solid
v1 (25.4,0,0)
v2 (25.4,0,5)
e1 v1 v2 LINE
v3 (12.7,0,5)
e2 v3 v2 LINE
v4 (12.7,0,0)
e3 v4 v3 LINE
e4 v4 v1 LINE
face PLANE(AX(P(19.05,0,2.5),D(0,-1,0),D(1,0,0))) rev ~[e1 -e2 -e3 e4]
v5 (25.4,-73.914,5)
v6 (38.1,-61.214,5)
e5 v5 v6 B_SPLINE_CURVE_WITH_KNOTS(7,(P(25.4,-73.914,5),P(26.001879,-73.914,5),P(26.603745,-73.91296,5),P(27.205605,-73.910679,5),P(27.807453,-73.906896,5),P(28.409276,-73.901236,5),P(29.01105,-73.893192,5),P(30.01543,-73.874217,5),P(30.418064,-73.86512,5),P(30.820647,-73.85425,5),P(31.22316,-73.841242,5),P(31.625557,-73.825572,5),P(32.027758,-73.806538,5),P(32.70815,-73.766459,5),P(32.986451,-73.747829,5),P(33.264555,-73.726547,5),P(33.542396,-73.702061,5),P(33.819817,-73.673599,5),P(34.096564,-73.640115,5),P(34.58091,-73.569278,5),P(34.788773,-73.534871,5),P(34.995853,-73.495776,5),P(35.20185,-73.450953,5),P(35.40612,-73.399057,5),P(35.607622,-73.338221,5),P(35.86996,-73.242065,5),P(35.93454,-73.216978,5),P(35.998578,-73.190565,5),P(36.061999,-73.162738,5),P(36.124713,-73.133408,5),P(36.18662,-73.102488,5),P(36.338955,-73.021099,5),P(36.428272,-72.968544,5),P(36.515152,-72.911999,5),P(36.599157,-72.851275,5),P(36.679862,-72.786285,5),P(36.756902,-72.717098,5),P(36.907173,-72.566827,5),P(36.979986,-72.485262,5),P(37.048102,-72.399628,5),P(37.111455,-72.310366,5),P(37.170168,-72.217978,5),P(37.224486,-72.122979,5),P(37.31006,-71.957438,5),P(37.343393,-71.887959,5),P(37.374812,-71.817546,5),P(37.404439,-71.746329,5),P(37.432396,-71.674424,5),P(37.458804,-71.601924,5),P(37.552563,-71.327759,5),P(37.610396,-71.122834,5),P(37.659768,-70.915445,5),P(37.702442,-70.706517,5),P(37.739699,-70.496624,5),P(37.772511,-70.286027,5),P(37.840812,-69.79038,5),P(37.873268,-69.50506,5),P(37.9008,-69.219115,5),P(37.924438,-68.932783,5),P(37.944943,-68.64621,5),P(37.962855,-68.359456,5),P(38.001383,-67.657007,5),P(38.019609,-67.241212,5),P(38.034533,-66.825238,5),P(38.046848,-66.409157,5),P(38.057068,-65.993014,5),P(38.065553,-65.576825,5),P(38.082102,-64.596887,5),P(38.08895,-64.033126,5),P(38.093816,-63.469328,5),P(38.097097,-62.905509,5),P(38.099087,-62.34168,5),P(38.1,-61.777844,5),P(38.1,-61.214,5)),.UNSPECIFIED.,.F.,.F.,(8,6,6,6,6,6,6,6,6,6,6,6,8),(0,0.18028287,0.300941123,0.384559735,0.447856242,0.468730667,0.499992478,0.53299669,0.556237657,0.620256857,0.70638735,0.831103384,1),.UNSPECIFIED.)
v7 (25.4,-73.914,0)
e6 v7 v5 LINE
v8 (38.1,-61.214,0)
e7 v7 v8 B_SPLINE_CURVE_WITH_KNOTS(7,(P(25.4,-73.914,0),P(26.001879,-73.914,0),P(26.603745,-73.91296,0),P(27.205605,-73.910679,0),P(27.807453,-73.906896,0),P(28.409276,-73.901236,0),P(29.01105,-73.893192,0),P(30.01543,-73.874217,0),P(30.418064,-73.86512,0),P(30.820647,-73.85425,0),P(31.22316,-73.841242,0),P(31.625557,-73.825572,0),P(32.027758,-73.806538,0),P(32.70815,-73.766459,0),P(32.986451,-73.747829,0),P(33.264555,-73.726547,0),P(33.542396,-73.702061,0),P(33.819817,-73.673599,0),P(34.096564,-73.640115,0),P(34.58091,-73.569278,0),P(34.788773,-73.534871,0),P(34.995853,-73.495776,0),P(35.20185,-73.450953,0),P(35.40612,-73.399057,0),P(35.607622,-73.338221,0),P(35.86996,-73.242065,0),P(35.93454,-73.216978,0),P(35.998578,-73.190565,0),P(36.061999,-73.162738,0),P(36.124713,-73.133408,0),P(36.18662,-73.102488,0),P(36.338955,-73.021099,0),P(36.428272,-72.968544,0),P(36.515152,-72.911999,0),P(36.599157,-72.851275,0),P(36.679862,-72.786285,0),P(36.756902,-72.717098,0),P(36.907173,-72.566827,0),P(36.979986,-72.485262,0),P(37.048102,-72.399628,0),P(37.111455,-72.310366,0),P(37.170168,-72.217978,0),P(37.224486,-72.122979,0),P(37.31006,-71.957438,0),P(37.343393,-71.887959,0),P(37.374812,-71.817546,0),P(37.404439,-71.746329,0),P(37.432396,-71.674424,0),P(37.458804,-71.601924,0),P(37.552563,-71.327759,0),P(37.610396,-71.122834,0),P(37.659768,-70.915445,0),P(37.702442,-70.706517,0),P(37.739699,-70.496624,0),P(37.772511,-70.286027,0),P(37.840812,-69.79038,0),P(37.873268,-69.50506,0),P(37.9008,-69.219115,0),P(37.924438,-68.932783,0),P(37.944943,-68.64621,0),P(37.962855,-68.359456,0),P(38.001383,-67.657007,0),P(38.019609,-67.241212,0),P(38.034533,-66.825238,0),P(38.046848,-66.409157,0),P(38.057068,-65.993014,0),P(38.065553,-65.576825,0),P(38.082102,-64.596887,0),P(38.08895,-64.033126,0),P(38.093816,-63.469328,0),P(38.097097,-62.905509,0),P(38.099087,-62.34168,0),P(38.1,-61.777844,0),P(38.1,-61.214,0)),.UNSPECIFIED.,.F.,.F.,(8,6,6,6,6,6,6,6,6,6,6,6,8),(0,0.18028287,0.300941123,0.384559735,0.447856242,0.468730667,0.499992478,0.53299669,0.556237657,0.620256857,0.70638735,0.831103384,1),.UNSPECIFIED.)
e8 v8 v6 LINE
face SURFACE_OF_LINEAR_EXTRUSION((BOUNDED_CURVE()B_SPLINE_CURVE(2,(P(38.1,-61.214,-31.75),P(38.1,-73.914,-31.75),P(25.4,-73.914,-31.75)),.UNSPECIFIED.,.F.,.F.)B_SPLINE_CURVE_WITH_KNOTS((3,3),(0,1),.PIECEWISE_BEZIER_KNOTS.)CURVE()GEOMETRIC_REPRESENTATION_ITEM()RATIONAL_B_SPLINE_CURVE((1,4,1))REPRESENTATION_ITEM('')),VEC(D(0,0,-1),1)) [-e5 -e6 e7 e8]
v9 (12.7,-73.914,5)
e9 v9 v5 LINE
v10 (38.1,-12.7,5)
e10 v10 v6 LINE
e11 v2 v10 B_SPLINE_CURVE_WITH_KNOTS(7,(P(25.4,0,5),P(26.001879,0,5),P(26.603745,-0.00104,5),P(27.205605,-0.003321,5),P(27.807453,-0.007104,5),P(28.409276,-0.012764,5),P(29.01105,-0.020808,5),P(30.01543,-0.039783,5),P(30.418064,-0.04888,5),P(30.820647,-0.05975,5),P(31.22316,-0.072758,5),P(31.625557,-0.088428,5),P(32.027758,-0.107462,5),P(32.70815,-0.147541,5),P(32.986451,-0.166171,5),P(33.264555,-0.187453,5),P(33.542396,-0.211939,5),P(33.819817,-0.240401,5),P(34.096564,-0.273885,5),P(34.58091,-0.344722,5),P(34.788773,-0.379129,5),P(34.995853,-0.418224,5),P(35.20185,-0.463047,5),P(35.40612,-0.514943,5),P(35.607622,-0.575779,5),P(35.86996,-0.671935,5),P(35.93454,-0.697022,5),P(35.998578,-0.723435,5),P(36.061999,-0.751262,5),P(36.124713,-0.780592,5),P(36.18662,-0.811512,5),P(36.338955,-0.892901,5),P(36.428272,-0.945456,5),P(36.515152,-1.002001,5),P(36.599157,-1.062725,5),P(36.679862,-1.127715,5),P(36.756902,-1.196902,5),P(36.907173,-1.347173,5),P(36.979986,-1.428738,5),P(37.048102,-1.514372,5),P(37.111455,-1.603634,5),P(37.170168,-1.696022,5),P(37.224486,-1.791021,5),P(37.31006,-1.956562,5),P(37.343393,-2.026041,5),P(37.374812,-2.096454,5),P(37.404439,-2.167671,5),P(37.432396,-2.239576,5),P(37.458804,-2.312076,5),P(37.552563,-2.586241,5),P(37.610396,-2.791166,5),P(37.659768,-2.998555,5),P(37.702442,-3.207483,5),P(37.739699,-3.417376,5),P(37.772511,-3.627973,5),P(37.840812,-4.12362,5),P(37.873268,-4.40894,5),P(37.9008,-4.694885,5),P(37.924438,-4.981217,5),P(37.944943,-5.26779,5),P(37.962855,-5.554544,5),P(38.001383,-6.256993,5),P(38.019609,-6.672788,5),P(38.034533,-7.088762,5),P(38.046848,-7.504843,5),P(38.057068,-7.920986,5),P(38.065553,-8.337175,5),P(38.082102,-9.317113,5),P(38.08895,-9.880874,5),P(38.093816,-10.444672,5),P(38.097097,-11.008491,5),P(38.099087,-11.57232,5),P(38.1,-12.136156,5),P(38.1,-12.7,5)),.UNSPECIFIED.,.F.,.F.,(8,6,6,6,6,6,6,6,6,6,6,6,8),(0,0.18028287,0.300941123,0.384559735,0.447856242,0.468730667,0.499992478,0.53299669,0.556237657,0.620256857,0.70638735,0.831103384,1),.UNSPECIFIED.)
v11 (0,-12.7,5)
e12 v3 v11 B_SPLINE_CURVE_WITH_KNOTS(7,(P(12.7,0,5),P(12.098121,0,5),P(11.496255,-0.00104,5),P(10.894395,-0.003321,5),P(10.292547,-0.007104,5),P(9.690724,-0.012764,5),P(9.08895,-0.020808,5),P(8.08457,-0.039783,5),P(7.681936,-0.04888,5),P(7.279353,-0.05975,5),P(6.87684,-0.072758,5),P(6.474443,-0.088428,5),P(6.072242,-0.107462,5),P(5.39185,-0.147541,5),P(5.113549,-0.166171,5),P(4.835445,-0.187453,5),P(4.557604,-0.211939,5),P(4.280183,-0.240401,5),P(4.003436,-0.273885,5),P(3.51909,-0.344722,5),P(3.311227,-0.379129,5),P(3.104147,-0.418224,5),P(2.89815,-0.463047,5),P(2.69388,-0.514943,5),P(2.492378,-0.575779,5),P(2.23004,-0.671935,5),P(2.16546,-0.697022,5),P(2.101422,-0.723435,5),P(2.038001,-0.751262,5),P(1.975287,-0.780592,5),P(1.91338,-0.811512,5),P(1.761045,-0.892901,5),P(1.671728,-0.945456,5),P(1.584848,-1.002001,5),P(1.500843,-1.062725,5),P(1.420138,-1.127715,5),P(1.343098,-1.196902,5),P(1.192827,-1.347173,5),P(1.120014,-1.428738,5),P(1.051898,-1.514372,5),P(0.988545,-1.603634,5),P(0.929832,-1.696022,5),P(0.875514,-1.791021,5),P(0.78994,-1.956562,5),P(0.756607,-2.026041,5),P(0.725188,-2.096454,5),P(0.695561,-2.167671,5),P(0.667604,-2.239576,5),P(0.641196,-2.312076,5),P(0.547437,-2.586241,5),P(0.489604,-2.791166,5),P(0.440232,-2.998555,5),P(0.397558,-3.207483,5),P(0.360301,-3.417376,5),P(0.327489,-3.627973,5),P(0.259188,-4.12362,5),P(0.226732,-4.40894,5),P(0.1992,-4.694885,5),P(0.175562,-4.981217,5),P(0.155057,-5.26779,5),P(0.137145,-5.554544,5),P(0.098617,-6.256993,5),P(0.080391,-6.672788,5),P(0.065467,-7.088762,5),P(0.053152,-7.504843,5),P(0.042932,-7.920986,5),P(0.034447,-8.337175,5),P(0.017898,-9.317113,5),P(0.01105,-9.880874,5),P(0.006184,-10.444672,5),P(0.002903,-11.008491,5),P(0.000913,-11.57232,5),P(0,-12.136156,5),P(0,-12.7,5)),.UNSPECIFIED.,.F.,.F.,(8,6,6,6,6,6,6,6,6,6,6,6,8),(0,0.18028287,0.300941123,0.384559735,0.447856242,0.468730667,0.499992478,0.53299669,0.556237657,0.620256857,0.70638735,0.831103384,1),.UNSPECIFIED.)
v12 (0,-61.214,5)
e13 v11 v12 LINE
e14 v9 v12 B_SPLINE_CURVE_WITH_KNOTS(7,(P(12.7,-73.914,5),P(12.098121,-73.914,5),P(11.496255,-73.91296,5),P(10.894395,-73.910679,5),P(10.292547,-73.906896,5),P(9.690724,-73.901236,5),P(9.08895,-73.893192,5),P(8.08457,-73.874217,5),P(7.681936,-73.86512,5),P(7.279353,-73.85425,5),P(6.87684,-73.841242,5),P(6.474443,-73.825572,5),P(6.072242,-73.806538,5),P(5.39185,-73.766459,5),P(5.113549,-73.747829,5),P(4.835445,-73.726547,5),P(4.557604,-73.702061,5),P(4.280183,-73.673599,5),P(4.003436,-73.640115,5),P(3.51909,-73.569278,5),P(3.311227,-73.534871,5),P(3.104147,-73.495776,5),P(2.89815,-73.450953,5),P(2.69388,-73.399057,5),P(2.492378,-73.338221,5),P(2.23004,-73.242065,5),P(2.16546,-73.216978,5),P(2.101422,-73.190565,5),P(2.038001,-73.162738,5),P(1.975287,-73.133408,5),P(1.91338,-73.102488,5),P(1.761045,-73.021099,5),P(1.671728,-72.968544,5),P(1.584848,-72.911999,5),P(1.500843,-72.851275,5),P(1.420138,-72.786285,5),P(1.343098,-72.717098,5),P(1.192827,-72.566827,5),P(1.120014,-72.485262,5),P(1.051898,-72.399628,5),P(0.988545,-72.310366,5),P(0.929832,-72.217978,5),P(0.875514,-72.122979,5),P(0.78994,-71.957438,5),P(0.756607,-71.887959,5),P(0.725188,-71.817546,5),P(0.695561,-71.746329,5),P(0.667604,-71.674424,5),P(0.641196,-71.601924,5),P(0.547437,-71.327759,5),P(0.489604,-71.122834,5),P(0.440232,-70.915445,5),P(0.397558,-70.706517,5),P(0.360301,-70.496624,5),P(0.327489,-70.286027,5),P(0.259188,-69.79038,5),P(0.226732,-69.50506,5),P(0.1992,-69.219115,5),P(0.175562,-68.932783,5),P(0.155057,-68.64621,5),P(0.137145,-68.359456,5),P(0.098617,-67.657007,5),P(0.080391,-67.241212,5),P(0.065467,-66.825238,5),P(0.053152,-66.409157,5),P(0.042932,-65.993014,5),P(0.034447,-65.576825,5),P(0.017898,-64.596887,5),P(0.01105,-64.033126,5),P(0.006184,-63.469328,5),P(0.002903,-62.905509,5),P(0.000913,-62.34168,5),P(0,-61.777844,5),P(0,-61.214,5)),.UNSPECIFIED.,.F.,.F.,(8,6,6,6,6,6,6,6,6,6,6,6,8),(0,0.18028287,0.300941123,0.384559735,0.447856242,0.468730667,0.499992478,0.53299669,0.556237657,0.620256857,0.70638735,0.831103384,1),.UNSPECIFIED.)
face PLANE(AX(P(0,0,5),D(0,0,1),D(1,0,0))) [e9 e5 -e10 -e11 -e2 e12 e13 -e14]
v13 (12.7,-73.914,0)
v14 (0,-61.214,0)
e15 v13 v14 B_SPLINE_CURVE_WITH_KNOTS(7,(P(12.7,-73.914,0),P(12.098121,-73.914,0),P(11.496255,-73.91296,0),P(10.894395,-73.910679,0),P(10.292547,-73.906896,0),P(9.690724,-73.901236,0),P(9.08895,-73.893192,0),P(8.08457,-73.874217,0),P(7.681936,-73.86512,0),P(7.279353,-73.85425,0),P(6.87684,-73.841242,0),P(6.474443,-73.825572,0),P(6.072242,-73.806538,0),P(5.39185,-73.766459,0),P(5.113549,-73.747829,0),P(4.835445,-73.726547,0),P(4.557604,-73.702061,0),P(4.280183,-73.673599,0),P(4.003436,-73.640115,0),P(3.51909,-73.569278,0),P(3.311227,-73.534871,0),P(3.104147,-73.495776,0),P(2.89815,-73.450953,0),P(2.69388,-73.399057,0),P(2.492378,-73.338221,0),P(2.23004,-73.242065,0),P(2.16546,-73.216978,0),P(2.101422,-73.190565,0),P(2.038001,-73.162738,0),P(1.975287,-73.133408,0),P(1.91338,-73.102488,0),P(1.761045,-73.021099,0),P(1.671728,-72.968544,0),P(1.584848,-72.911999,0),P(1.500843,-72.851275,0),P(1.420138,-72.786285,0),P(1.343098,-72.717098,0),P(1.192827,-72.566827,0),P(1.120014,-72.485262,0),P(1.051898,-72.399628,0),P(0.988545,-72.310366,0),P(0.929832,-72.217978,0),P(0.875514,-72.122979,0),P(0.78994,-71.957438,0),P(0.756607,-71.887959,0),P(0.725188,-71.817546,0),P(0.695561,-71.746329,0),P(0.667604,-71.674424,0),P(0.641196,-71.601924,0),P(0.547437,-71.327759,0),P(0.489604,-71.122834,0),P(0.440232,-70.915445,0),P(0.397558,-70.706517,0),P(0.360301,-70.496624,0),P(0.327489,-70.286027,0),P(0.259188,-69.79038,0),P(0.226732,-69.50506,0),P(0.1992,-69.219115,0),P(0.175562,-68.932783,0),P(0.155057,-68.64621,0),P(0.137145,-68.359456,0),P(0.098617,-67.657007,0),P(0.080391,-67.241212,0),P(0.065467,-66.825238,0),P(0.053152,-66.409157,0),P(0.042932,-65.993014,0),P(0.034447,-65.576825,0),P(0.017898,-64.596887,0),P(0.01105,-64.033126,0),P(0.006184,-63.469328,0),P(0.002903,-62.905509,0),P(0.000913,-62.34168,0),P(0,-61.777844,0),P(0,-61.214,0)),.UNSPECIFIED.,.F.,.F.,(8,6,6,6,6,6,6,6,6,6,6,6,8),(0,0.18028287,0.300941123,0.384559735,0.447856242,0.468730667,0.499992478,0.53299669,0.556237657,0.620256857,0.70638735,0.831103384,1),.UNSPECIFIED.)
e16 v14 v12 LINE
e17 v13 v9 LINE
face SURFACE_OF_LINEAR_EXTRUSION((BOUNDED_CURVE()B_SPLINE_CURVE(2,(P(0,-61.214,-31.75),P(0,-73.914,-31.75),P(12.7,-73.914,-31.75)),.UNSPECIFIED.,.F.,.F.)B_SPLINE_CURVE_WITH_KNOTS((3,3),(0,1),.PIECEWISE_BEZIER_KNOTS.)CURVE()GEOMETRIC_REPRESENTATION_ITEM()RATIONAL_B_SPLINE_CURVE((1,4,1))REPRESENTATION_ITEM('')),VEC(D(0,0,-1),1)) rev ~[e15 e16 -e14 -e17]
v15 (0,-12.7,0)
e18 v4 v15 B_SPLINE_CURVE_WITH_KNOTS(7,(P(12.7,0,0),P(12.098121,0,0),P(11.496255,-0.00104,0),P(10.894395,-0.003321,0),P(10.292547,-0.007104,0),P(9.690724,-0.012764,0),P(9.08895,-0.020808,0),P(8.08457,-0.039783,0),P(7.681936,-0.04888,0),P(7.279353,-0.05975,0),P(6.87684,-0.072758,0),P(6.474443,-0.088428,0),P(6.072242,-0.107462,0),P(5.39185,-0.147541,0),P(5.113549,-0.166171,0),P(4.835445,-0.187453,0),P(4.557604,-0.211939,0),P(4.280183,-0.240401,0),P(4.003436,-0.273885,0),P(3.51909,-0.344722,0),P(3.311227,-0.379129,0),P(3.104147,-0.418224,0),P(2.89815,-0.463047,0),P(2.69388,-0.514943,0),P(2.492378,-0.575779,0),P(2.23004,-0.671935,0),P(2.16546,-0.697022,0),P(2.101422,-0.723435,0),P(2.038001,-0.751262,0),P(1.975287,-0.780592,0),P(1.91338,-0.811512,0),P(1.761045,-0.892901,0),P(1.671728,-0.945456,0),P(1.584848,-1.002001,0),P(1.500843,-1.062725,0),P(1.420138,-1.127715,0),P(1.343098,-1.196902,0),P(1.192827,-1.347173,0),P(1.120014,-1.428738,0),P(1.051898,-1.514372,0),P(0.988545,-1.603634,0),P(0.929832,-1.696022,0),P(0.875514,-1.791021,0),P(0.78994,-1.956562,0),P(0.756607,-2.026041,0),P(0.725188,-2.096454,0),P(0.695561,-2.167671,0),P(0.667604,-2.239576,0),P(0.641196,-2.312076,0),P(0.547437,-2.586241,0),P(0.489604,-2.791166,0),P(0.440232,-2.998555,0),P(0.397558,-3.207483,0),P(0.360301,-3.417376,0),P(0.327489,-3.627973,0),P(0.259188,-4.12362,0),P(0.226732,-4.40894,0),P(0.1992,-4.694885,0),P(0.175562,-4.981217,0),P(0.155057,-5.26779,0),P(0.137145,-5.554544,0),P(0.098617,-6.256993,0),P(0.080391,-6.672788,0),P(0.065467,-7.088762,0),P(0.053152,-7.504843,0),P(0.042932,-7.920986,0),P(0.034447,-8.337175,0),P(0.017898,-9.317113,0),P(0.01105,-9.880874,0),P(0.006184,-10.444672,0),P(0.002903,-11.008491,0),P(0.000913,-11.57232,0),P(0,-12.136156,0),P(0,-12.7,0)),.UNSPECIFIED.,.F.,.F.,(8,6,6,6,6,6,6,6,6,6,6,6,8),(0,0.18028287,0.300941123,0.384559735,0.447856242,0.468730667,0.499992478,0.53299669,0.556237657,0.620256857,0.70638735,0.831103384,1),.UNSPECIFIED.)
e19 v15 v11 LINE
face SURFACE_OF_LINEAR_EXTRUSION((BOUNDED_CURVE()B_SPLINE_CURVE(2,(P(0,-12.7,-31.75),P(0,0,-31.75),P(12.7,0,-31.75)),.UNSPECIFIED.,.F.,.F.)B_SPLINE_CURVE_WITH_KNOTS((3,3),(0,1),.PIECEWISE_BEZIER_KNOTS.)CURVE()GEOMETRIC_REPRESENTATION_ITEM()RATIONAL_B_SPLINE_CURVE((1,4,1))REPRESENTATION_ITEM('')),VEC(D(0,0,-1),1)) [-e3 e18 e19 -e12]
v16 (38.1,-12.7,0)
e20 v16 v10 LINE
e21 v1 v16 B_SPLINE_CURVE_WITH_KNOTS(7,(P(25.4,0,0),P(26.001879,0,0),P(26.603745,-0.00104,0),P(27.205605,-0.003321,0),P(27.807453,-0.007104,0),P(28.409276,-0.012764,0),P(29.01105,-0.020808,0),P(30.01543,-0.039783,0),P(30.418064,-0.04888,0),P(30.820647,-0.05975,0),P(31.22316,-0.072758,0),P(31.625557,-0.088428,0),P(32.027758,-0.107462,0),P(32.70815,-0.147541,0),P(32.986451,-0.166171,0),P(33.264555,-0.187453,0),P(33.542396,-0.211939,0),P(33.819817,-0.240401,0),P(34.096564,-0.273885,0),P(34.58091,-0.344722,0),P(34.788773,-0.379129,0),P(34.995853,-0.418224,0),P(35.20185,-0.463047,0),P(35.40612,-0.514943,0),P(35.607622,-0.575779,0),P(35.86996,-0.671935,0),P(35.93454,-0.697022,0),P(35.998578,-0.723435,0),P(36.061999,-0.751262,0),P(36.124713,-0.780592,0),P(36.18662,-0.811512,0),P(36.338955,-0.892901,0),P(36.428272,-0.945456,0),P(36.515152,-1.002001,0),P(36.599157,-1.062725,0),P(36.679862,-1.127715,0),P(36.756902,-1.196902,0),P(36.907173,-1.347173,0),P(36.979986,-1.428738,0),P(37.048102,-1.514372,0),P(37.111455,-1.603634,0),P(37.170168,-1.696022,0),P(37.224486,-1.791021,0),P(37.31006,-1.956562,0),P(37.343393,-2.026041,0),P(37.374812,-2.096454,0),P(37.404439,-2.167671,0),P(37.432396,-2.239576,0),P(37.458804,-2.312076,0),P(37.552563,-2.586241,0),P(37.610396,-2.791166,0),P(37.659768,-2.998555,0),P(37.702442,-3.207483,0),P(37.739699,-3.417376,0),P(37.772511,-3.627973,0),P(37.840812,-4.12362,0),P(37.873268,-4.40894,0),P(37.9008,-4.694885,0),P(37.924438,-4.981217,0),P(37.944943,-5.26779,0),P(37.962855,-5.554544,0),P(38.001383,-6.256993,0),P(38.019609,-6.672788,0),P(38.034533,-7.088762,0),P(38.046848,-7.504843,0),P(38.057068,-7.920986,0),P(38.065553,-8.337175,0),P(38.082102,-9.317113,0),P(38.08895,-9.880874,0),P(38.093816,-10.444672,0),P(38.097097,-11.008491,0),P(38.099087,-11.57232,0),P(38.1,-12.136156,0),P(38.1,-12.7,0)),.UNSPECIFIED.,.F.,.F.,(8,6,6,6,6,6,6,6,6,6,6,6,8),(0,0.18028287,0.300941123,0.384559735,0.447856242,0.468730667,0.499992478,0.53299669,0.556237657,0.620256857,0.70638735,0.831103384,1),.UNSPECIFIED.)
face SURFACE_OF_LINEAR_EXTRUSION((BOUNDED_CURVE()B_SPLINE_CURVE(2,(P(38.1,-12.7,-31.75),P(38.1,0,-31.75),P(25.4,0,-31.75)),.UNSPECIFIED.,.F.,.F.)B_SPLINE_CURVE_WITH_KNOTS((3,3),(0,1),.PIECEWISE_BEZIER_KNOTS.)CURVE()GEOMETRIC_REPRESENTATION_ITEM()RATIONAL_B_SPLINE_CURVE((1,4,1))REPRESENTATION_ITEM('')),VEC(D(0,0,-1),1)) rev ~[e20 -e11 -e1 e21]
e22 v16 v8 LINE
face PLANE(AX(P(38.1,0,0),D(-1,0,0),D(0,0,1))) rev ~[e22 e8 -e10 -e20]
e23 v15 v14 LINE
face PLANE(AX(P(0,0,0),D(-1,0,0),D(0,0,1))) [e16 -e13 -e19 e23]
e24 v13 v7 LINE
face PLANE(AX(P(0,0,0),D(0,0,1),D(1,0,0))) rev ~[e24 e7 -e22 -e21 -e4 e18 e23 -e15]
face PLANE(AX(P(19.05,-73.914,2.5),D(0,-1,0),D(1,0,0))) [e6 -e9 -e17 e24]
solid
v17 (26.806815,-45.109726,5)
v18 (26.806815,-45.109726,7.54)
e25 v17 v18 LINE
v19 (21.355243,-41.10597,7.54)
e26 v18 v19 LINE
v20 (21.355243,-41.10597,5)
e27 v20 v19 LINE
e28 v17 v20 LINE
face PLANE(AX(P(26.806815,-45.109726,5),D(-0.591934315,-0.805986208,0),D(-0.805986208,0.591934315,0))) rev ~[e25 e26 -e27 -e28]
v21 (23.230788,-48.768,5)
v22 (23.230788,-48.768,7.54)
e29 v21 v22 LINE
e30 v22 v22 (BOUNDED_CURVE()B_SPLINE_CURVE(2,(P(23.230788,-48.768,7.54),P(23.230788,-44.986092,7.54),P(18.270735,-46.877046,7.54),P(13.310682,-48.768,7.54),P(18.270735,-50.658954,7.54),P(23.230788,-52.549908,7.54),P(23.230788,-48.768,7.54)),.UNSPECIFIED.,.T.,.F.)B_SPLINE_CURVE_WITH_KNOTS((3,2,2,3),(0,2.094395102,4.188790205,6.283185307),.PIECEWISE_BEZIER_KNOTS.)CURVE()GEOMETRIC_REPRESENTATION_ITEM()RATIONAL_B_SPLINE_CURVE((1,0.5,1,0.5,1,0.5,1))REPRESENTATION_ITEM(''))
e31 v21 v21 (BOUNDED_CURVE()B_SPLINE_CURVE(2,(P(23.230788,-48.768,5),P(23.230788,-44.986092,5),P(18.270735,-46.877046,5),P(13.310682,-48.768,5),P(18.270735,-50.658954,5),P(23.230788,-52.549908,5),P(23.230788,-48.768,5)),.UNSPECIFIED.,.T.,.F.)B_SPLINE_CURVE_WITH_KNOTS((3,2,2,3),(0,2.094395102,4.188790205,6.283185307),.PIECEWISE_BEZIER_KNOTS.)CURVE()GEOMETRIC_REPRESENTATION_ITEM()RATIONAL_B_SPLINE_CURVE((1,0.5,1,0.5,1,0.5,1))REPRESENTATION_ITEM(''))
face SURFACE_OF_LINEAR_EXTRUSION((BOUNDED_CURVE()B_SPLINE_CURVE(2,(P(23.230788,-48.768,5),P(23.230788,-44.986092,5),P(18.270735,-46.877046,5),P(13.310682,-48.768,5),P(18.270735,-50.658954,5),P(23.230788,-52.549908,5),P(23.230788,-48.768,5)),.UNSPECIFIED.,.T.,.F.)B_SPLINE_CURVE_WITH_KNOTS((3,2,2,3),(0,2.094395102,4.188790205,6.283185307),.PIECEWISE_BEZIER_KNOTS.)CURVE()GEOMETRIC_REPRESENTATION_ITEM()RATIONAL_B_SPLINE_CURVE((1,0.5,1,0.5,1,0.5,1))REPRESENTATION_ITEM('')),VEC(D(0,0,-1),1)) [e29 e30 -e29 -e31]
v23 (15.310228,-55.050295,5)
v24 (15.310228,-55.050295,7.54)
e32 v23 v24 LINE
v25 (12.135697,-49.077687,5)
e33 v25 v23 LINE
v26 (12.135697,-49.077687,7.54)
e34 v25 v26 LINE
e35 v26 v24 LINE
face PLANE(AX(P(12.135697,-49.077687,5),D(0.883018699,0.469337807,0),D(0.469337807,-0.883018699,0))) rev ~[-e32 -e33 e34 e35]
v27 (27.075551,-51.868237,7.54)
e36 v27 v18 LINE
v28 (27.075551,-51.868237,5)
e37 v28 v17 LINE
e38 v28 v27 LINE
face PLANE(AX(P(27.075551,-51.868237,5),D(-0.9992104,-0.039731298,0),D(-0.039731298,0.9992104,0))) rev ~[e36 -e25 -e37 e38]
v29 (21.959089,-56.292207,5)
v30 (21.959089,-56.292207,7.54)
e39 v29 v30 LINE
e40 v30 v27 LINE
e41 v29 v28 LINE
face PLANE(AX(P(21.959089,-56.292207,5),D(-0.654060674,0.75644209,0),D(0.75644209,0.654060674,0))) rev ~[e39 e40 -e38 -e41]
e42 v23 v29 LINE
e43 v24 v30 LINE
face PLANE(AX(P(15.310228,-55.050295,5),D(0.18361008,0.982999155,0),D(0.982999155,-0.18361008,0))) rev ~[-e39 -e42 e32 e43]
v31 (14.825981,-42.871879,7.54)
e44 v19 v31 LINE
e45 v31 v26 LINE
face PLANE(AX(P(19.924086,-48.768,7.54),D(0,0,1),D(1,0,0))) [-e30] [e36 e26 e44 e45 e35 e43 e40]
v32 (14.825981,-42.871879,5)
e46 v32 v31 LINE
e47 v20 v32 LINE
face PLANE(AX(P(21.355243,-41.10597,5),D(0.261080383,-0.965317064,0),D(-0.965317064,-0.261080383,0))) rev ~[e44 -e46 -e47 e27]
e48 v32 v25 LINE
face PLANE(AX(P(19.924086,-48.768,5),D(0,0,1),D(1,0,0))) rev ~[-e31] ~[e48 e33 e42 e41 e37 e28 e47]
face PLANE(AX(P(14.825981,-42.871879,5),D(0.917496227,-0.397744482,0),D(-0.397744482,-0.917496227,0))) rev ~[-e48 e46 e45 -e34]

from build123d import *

# Parameters (mm, degrees)
F0_W        = 38.1
F0_H        = 5
F1_DEPTH    = 73.914
F2_T1_DEPTH = 68.5
F5_DEPTH    = 2.54


# Not quite as in the source:
# - a fillet or chamfer that OpenCascade refuses, or shapes differently, is made with other operations: its cross-section is extruded or revolved along the edge and cut away or added


with BuildPart() as f1:
    # F0 (on Front) → F1 (new body)
    with BuildSketch(Plane.XZ):
        with Locations((19.05, 2.5)):
            Rectangle(F0_W, F0_H)
    extrude(amount=F1_DEPTH)

    # F2: fillet of radius 12.7 on 4 edges, made by hand

    # F2_s2 → F2_t1 (cut)
    with BuildSketch(Plane.XY.offset(-31.75)):
        with BuildLine():
            add(Edge.make_bspline(
                [(38.1, -61.214), (38.1, -73.914), (25.4, -73.914)],
                knots=[0, 0, 0, 1, 1, 1], degree=2, weights=[1, 4, 1]))
            Line((25.4, -73.914), (38.1, -73.914))
            Line((38.1, -73.914), (38.1, -61.214))
        make_face()
        with BuildLine():
            add(Edge.make_bspline(
                [(0, -12.7), (0, 0), (12.7, 0)],
                knots=[0, 0, 0, 1, 1, 1], degree=2, weights=[1, 4, 1]))
            Line((12.7, 0), (0, 0))
            Line((0, 0), (0, -12.7))
        make_face()
        with BuildLine():
            add(Edge.make_bspline(
                [(38.1, -12.7), (38.1, 0), (25.4, 0)],
                knots=[0, 0, 0, 1, 1, 1], degree=2, weights=[1, 4, 1]))
            Line((25.4, 0), (38.1, 0))
            Line((38.1, 0), (38.1, -12.7))
        make_face()
        with BuildLine():
            add(Edge.make_bspline(
                [(0, -61.214), (0, -73.914), (12.7, -73.914)],
                knots=[0, 0, 0, 1, 1, 1], degree=2, weights=[1, 4, 1]))
            Line((12.7, -73.914), (0, -73.914))
            Line((0, -73.914), (0, -61.214))
        make_face()
    extrude(amount=F2_T1_DEPTH, mode=Mode.SUBTRACT)


with BuildPart() as f5:
    # F4 (on face) → F5 (new body)
    with BuildSketch(Plane.XY.offset(5)):
        Polygon((21.9590889072, -56.2922066174), (27.0755512858, -51.8682369866), (26.8068146657, -45.1097256716), (21.3552432029, -41.1059695411), (14.8259814009, -42.8718786231), (12.1356965691, -49.0776873608), (15.3102280577, -55.0502951994), align=None)
        with BuildLine():
            add(Edge.make_bspline(
                [(23.230788256, -48.768), (23.230788256, -44.9860916248), (18.2707353197, -46.8770458124), (13.3106823833, -48.768), (18.2707353197, -50.6589541876), (23.230788256, -52.5499083752), (23.230788256, -48.768)],
                knots=[0, 0, 0, 2.0943951024, 2.0943951024, 4.1887902048, 4.1887902048, 6.2831853072, 6.2831853072, 6.2831853072], degree=2, weights=[1, 0.5, 1, 0.5, 1, 0.5, 1]))
        make_face(mode=Mode.SUBTRACT)
    extrude(amount=F5_DEPTH)


solid = Compound([f1.part, f5.part])
